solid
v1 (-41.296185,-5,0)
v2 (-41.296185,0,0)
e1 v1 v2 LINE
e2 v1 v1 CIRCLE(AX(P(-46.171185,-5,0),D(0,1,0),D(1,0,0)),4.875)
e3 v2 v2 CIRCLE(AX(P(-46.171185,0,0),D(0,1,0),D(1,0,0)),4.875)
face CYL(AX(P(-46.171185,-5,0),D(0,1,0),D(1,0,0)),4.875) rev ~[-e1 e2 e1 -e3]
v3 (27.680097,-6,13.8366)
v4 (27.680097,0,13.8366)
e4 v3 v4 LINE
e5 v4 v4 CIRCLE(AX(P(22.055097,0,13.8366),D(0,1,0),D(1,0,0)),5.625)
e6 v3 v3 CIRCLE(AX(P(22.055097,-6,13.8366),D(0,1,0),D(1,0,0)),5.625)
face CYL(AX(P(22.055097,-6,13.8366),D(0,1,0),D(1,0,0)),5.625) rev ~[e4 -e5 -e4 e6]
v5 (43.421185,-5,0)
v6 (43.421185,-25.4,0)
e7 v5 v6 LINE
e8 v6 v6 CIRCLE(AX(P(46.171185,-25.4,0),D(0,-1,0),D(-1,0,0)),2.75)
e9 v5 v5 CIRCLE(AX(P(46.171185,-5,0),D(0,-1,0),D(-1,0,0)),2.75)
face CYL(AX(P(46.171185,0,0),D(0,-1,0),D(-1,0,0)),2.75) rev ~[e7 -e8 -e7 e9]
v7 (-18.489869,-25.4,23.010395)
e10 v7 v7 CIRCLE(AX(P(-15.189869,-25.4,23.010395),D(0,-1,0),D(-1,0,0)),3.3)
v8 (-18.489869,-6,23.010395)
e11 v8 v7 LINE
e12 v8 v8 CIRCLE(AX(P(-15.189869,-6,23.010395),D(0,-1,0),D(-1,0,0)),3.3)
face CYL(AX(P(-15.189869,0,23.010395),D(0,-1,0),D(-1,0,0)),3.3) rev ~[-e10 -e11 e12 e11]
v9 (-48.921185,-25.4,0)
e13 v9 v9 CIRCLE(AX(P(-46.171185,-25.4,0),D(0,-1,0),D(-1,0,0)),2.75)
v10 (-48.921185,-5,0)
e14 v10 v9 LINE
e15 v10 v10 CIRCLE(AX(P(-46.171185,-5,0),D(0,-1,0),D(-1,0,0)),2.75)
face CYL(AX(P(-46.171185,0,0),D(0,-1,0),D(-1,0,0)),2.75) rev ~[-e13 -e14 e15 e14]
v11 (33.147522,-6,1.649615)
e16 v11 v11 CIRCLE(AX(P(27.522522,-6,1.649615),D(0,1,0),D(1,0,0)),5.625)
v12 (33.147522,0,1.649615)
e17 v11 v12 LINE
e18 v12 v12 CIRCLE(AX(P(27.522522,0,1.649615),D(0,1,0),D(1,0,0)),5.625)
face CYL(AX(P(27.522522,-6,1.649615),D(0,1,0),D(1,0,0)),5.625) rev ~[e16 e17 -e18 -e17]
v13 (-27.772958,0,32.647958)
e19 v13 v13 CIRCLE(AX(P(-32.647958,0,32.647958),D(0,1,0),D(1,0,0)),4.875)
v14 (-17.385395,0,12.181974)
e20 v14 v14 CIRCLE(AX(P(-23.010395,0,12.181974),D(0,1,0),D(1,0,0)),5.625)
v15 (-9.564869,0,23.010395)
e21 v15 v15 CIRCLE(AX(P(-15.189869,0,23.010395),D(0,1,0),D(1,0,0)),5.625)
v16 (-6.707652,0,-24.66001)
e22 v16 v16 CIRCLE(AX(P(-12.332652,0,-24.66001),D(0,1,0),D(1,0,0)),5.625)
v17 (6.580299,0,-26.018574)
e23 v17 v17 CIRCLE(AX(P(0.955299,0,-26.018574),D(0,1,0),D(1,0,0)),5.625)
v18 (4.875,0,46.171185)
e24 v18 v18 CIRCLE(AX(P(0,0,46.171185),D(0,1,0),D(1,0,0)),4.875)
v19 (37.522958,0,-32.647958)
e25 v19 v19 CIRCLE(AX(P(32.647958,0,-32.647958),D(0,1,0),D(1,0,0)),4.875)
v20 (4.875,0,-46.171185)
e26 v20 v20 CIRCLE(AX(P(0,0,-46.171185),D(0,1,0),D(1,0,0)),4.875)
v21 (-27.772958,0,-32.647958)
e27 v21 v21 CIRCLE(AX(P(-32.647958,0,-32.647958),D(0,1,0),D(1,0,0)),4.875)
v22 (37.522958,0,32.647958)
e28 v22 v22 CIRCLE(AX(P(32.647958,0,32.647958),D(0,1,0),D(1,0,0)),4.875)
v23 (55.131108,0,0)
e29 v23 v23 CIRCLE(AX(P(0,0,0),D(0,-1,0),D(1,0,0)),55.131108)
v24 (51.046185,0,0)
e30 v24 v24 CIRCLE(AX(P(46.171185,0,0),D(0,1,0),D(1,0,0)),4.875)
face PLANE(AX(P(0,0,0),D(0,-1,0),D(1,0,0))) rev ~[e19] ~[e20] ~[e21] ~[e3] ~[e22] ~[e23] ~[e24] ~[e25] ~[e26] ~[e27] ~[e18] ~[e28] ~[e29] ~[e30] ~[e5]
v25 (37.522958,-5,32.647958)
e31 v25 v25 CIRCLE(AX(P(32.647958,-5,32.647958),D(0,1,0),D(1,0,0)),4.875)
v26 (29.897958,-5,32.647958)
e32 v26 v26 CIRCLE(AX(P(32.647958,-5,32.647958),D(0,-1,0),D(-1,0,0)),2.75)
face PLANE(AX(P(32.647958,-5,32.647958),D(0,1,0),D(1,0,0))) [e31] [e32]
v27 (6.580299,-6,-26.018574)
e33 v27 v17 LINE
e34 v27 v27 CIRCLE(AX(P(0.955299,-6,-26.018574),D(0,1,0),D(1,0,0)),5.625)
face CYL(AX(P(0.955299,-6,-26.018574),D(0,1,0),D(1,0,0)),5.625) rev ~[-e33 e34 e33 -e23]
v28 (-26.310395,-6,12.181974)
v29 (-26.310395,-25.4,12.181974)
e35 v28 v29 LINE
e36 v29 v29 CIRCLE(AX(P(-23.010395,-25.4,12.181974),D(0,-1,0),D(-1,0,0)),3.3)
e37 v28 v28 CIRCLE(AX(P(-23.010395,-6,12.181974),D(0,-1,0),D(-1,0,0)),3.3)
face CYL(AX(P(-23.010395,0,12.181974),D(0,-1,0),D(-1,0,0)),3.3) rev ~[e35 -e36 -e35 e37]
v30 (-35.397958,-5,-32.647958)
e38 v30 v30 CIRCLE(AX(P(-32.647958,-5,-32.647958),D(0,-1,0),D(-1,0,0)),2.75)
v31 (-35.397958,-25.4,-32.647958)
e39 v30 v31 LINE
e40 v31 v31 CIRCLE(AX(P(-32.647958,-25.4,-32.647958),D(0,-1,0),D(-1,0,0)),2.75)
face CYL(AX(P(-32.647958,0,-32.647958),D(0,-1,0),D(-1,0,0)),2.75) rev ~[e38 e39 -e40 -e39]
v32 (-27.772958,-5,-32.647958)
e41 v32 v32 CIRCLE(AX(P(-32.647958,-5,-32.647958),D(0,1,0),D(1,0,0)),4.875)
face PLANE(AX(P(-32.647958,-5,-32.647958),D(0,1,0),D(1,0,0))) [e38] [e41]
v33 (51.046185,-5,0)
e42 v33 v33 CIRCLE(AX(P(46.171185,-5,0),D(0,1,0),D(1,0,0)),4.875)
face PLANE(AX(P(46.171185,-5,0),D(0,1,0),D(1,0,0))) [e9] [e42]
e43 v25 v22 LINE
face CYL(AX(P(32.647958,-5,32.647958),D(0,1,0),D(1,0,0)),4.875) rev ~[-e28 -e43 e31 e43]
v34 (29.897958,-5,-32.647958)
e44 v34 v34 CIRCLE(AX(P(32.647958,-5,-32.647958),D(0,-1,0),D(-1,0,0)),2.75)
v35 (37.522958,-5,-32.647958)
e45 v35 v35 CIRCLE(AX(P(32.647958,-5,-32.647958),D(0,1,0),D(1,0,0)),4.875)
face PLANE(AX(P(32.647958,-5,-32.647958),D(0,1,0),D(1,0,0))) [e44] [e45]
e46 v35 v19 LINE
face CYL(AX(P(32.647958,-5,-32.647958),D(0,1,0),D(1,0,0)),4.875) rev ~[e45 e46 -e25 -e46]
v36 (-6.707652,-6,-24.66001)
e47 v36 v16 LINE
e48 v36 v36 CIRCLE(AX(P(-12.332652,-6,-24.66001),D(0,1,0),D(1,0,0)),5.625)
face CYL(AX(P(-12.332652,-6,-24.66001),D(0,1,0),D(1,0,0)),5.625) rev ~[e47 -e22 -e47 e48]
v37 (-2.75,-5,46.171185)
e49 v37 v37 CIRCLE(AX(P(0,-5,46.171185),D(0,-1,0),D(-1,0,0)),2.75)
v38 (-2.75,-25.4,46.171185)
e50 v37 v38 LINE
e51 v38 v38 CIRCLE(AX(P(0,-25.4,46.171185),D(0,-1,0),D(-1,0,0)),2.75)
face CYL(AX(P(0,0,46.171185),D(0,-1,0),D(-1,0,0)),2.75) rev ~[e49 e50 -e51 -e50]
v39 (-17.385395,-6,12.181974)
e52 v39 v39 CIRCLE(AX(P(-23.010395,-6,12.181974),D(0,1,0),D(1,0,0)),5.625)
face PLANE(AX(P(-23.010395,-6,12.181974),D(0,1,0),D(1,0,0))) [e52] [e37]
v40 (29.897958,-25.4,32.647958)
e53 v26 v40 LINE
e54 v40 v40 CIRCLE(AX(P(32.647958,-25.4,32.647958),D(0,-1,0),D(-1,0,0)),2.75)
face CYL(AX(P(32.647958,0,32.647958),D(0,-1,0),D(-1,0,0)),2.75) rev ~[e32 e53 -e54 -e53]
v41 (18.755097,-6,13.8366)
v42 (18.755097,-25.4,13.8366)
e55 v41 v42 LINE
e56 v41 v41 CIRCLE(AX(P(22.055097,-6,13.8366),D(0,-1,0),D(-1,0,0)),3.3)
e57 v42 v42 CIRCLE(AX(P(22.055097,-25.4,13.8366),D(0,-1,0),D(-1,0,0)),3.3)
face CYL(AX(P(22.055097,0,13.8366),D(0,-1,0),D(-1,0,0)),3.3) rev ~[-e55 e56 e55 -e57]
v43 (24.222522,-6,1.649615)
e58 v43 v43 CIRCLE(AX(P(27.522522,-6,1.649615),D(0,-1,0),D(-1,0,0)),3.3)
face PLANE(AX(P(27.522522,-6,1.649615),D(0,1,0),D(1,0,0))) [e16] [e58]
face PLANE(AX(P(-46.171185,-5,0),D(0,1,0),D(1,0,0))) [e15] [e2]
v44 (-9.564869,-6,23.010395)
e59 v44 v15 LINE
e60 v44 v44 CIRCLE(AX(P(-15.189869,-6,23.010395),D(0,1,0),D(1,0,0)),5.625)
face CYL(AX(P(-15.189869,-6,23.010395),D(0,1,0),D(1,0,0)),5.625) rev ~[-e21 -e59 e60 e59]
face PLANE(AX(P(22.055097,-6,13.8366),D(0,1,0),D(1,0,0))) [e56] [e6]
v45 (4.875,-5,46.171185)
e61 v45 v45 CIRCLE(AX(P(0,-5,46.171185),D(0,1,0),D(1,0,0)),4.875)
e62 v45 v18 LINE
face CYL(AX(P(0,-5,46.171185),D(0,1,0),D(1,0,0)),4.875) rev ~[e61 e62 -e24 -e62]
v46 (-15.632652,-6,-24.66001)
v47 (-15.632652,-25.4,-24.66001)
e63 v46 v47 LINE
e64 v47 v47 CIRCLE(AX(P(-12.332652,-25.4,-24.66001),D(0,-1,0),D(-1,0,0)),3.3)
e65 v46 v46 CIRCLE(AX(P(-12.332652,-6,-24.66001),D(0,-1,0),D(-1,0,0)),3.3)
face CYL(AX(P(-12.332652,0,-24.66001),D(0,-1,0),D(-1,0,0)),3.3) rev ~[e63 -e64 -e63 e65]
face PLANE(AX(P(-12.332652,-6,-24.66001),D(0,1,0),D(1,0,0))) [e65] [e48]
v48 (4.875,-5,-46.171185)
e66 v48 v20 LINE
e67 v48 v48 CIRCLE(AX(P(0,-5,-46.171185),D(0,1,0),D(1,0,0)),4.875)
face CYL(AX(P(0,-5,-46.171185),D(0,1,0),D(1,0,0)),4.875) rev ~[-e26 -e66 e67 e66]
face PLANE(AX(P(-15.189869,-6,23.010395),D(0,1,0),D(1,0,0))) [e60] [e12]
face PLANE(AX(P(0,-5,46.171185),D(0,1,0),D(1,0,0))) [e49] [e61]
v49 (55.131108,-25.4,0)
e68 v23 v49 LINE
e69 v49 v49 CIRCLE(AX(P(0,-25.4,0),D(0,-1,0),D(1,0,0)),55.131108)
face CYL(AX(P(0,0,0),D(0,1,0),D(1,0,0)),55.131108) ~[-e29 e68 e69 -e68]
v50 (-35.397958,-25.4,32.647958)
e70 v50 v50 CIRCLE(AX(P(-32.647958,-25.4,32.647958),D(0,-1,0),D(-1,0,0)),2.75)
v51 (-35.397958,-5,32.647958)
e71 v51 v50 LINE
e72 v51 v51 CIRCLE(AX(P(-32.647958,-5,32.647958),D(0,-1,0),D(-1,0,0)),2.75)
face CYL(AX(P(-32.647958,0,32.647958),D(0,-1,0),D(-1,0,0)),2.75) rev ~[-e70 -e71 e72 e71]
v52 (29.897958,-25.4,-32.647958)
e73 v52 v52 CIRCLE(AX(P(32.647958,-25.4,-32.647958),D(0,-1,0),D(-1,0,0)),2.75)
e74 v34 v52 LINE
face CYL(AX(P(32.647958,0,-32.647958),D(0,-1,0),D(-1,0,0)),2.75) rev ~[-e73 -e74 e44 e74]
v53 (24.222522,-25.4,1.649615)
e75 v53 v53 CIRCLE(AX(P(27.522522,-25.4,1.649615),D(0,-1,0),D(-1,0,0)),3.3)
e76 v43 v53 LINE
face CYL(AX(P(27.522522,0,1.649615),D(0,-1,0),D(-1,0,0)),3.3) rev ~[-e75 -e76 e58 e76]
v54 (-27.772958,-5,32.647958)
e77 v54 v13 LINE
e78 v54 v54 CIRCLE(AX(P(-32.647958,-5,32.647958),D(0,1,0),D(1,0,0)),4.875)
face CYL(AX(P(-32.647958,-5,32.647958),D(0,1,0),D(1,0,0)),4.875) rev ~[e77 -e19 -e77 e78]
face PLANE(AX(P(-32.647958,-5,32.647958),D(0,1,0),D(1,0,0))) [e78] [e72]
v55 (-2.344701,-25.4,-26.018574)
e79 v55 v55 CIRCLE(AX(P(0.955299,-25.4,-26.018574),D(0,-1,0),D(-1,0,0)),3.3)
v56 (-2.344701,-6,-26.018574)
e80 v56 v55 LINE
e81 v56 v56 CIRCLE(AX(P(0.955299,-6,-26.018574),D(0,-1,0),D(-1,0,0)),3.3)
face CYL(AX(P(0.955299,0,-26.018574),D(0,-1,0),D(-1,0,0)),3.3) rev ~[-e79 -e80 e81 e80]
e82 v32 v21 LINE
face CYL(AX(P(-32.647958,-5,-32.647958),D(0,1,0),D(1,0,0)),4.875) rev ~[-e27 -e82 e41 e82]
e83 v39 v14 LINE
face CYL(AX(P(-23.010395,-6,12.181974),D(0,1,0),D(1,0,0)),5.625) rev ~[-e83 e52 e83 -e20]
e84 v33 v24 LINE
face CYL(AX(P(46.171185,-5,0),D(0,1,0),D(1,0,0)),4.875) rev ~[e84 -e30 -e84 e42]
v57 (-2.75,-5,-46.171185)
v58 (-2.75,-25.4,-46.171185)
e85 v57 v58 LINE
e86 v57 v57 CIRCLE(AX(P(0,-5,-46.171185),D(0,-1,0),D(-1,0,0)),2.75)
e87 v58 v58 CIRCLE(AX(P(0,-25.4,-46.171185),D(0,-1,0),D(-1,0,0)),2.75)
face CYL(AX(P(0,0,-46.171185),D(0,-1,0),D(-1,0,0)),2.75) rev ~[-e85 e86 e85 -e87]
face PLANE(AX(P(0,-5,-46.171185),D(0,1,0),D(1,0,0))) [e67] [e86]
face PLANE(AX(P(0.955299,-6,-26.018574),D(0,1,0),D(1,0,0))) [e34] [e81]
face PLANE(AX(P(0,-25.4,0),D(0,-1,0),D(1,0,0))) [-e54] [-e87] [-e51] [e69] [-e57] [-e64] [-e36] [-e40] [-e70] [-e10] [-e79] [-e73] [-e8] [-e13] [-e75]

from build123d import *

# Parameters (mm, degrees)
F0_R           = 55.1311075469
F2_DEPTH       = 25.4
F3_D           = 5.5
F3_CBORE_D     = 9.75
F3_CBORE_DEPTH = 5
F4_D           = 6.6
F4_CBORE_D     = 11.25
F4_CBORE_DEPTH = 6


with BuildPart() as f2:
    # F0 (on Front) → F2 (new body)
    with BuildSketch(Plane.XZ):
        Circle(F0_R)
    extrude(amount=F2_DEPTH)

    # F3 (through all)
    with Locations(Plane(origin=(0, 0, 0), x_dir=(1, 0, 0), z_dir=(0, 1, 0))):
        with Locations((-32.6479577467, -32.6479577467), (0, -46.1711846292), (32.6479577467, -32.6479577467), (46.1711846292, 0), (32.6479577467, 32.6479577467), (0, 46.1711846292), (-46.1711846292, 0), (-32.6479577467, 32.6479577467)):
            CounterBoreHole(F3_D / 2, F3_CBORE_D / 2, F3_CBORE_DEPTH)

    # F4 (through all)
    with Locations(Plane(origin=(0, 0, 0), x_dir=(1, 0, 0), z_dir=(0, 1, 0))):
        with Locations((-12.3326523611, 24.660010453), (0.9552987674, 26.0185740339), (-23.0103954673, -12.1819740161), (-15.1898693293, -23.0103954673), (22.0550966999, -13.8366000177), (27.5225216905, -1.6496149857)):
            CounterBoreHole(F4_D / 2, F4_CBORE_D / 2, F4_CBORE_DEPTH)


solid = f2.part
